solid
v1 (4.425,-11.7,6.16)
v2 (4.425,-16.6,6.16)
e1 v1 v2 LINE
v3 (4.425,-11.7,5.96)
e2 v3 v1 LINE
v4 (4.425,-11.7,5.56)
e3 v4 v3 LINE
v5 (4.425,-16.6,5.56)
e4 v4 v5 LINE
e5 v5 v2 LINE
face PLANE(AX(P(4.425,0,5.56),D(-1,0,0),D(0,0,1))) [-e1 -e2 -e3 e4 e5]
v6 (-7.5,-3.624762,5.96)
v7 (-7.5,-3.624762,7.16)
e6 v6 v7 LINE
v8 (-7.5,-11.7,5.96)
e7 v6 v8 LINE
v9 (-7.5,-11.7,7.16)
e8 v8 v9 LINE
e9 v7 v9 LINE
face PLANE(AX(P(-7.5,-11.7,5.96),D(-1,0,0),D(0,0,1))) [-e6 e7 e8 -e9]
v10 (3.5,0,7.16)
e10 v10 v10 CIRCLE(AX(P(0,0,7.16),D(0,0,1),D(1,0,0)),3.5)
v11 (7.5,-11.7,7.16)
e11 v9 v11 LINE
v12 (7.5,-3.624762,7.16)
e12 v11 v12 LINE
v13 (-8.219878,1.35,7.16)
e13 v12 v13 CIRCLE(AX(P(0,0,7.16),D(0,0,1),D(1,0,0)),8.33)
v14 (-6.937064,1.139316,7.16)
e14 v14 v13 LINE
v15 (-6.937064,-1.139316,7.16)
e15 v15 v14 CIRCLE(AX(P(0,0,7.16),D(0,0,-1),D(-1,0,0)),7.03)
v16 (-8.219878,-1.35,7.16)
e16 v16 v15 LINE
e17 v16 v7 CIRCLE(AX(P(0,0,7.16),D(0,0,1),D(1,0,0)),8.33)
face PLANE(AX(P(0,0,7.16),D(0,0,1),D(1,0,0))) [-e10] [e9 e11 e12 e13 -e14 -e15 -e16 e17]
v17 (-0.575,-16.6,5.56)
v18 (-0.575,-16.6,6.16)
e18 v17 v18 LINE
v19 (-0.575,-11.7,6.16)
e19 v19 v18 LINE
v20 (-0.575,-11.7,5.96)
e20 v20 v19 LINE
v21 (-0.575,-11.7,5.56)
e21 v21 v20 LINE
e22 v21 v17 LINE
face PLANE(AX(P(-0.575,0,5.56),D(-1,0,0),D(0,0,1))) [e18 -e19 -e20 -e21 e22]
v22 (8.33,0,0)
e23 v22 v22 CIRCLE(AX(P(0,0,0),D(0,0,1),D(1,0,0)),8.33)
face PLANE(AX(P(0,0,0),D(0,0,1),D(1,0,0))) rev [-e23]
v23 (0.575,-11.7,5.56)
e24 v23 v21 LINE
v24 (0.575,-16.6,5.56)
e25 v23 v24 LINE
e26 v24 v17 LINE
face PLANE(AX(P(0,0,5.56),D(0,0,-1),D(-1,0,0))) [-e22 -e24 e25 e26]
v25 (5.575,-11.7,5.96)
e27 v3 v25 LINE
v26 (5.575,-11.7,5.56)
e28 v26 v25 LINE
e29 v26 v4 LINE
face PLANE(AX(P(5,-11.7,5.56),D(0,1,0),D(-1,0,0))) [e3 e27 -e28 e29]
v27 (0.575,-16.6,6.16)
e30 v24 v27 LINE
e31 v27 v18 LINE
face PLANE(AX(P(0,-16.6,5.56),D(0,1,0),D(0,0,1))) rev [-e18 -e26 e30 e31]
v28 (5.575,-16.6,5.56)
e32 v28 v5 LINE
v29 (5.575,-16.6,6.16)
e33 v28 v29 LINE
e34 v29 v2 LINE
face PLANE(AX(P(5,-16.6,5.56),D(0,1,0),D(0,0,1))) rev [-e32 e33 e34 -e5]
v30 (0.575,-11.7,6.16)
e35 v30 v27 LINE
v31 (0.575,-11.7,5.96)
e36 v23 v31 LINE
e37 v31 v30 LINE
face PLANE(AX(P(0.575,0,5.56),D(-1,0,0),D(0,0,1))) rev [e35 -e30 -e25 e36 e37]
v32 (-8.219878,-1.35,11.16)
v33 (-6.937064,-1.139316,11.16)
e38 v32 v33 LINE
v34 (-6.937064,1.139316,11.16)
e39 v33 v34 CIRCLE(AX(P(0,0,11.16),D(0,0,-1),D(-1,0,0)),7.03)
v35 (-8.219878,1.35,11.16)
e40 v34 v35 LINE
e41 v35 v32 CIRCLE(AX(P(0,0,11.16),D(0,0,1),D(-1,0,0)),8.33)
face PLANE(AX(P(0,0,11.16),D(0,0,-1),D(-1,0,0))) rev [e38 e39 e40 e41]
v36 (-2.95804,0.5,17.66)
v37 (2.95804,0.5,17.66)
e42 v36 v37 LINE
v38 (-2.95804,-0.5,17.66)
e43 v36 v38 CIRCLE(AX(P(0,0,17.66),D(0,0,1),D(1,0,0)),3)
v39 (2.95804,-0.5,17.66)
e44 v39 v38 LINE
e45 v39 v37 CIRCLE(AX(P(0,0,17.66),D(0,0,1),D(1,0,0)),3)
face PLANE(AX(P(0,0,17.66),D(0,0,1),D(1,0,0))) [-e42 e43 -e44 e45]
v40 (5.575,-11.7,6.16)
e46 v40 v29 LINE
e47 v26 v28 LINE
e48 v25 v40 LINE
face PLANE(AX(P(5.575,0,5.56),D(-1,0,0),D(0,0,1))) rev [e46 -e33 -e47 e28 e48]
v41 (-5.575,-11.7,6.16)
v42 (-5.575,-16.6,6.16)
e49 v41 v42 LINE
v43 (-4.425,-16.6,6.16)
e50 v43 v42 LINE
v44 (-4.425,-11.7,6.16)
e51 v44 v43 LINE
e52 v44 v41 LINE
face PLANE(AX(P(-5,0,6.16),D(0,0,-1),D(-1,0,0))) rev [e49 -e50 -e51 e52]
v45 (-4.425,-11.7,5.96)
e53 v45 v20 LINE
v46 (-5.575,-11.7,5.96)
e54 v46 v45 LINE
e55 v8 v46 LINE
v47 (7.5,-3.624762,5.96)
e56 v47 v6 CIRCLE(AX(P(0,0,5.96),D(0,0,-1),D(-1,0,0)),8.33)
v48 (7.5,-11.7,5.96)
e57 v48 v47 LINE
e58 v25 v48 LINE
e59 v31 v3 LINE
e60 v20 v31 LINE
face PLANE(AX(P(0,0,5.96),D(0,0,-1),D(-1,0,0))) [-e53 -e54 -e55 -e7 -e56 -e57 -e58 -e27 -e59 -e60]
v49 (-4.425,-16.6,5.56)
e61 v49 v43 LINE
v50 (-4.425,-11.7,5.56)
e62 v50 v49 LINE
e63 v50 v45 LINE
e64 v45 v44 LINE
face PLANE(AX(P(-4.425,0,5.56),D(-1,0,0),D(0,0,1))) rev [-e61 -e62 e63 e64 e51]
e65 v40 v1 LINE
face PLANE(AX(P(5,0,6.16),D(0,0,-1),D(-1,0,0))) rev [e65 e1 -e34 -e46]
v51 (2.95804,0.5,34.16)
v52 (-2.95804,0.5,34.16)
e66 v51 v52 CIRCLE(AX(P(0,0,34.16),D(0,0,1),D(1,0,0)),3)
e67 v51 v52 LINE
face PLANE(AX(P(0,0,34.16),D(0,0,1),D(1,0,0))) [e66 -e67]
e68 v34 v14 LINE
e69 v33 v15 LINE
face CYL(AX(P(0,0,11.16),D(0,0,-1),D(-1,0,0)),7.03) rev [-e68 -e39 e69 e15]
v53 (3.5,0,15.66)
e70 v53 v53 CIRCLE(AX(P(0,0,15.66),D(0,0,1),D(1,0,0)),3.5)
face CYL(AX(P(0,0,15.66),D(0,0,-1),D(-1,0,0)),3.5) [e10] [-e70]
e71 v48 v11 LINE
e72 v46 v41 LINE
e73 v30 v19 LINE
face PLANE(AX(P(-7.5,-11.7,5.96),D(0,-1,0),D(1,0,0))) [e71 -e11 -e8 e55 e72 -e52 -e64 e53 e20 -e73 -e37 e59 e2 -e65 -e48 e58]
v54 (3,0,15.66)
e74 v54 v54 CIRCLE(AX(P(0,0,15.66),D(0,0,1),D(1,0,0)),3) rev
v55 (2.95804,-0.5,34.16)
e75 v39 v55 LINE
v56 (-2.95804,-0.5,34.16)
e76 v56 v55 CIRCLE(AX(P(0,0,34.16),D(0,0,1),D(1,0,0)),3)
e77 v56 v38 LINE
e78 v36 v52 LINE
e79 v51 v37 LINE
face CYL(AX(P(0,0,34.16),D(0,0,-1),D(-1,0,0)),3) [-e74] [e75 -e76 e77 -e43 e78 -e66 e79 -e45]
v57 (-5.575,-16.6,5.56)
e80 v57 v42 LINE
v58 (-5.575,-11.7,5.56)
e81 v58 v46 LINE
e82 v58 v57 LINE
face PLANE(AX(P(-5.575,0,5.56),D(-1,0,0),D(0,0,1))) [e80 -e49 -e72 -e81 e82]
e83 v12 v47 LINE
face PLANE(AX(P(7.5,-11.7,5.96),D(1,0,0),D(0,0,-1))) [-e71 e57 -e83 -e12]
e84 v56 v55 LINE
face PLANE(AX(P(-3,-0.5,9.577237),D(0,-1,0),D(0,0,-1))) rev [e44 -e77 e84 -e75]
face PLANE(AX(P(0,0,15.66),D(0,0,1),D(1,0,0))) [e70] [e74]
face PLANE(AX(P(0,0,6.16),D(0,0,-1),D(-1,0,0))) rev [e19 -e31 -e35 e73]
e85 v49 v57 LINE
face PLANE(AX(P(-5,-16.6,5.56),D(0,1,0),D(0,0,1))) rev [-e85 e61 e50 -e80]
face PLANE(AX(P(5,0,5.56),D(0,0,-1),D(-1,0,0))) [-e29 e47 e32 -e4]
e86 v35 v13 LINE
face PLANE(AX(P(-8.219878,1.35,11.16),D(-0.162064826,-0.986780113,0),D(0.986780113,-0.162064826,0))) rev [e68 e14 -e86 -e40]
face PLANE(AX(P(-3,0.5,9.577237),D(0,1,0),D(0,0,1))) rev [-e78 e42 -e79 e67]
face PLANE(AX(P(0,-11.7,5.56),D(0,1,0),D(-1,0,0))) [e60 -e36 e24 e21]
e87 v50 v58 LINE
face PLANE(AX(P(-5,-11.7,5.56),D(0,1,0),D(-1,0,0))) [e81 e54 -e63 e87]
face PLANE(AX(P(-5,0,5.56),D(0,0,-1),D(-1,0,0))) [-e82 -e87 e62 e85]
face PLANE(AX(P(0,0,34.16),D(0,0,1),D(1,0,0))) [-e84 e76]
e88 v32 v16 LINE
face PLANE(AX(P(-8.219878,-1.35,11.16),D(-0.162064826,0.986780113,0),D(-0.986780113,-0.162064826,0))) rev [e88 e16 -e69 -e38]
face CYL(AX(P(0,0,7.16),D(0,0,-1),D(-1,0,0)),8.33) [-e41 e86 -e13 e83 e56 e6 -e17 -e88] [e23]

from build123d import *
from build123d.topology import SkipClean

# Parameters (mm, degrees)
SKETCH1_R           = 8.33
BOSS_EXTRUDE1_DEPTH = 7.16
SKETCH2_R           = 3.5
BOSS_EXTRUDE2_DEPTH = 8.5
BOSS_EXTRUDE6_START = -8.5
SKETCH6_R           = 3
BOSS_EXTRUDE6_DEPTH = 27
SKETCH7_W           = 6
SKETCH7_H           = 1
CUT_EXTRUDE1_DEPTH  = 16.5
SKETCH3_W           = 15
SKETCH3_H           = 11.20454244
BOSS_EXTRUDE3_DEPTH = 1.2
BOSS_EXTRUDE4_START = -0.2
SKETCH4_W           = 1.15
SKETCH4_H           = 4.9
BOSS_EXTRUDE4_DEPTH = 0.6
LPATTERN1_COUNT     = 2
LPATTERN1_PITCH     = 5
LPATTERN1_COL_COUNT = 2
LPATTERN1_COL_PITCH = 5
BOSS_EXTRUDE5_DEPTH = 4


with BuildPart() as part:
    # Sketch1 → Boss-Extrude1 (new body)
    with BuildSketch(Plane.XY):
        with Locations(Location((0, 0, 0), (0, 0, 180))):
            Circle(SKETCH1_R)
    extrude(amount=BOSS_EXTRUDE1_DEPTH)

    # Sketch2 → Boss-Extrude2 (add)
    with BuildSketch(Plane.XY.offset(7.16)):
        Circle(SKETCH2_R)
    extrude(amount=BOSS_EXTRUDE2_DEPTH)

    # Sketch6 → Boss-Extrude6 (add)
    with BuildSketch(Plane.XY.offset(15.66).offset(BOSS_EXTRUDE6_START)):
        Circle(SKETCH6_R)
    extrude(amount=BOSS_EXTRUDE6_DEPTH)

    # Sketch7 → Cut-Extrude1 (cut)
    with BuildSketch(Plane.XY.offset(34.16)):
        Rectangle(SKETCH7_W, SKETCH7_H)
    extrude(amount=-CUT_EXTRUDE1_DEPTH, mode=Mode.SUBTRACT)

    # Sketch3 → Boss-Extrude3 (add)
    with BuildSketch(Plane.XY.offset(7.16)):
        with Locations((0, -6.09772878)):
            Rectangle(SKETCH3_W, SKETCH3_H)
    extrude(amount=-BOSS_EXTRUDE3_DEPTH)

    # Sketch4 → Boss-Extrude4 (add)
    with BuildSketch(Plane(origin=(0, 0, 5.96), x_dir=(-1, 0, 0), z_dir=(0, 0, -1)).offset(BOSS_EXTRUDE4_START)):
        with Locations((0, -14.15)):
            Rectangle(SKETCH4_W, SKETCH4_H)
    boss_extrude4 = extrude(amount=BOSS_EXTRUDE4_DEPTH)

    # LPattern1: Boss-Extrude4 ×2
    with Locations(*[(i * LPATTERN1_PITCH, 0, 0) for i in range(1, LPATTERN1_COUNT)]):
        add(boss_extrude4)

    # LPattern1 col: Boss-Extrude4 ×2
    with Locations(*[(-i * LPATTERN1_COL_PITCH, 0, 0) for i in range(1, LPATTERN1_COL_COUNT)]):
        add(boss_extrude4)

    # Sketch5 → Boss-Extrude5 (add)
    with SkipClean():  # the faces are left unmerged after this step: merging them gives an invalid solid
        with BuildSketch(Plane.XY.offset(7.16)):
            with BuildLine():
                Line((-8.219878345, 1.35), (-6.937064197, 1.139315726))
                ThreePointArc((-6.937064197, 1.139315726), (-7.03, 0), (-6.937064197, -1.139315726))
                Line((-6.937064197, -1.139315726), (-8.219878345, -1.35))
                ThreePointArc((-8.219878345, -1.35), (-8.33, 0), (-8.219878345, 1.35))
            make_face()
        extrude(amount=BOSS_EXTRUDE5_DEPTH)
    add(part.part.scale(1), mode=Mode.REPLACE)  # the faces are merged on a copy


solid = part.part
